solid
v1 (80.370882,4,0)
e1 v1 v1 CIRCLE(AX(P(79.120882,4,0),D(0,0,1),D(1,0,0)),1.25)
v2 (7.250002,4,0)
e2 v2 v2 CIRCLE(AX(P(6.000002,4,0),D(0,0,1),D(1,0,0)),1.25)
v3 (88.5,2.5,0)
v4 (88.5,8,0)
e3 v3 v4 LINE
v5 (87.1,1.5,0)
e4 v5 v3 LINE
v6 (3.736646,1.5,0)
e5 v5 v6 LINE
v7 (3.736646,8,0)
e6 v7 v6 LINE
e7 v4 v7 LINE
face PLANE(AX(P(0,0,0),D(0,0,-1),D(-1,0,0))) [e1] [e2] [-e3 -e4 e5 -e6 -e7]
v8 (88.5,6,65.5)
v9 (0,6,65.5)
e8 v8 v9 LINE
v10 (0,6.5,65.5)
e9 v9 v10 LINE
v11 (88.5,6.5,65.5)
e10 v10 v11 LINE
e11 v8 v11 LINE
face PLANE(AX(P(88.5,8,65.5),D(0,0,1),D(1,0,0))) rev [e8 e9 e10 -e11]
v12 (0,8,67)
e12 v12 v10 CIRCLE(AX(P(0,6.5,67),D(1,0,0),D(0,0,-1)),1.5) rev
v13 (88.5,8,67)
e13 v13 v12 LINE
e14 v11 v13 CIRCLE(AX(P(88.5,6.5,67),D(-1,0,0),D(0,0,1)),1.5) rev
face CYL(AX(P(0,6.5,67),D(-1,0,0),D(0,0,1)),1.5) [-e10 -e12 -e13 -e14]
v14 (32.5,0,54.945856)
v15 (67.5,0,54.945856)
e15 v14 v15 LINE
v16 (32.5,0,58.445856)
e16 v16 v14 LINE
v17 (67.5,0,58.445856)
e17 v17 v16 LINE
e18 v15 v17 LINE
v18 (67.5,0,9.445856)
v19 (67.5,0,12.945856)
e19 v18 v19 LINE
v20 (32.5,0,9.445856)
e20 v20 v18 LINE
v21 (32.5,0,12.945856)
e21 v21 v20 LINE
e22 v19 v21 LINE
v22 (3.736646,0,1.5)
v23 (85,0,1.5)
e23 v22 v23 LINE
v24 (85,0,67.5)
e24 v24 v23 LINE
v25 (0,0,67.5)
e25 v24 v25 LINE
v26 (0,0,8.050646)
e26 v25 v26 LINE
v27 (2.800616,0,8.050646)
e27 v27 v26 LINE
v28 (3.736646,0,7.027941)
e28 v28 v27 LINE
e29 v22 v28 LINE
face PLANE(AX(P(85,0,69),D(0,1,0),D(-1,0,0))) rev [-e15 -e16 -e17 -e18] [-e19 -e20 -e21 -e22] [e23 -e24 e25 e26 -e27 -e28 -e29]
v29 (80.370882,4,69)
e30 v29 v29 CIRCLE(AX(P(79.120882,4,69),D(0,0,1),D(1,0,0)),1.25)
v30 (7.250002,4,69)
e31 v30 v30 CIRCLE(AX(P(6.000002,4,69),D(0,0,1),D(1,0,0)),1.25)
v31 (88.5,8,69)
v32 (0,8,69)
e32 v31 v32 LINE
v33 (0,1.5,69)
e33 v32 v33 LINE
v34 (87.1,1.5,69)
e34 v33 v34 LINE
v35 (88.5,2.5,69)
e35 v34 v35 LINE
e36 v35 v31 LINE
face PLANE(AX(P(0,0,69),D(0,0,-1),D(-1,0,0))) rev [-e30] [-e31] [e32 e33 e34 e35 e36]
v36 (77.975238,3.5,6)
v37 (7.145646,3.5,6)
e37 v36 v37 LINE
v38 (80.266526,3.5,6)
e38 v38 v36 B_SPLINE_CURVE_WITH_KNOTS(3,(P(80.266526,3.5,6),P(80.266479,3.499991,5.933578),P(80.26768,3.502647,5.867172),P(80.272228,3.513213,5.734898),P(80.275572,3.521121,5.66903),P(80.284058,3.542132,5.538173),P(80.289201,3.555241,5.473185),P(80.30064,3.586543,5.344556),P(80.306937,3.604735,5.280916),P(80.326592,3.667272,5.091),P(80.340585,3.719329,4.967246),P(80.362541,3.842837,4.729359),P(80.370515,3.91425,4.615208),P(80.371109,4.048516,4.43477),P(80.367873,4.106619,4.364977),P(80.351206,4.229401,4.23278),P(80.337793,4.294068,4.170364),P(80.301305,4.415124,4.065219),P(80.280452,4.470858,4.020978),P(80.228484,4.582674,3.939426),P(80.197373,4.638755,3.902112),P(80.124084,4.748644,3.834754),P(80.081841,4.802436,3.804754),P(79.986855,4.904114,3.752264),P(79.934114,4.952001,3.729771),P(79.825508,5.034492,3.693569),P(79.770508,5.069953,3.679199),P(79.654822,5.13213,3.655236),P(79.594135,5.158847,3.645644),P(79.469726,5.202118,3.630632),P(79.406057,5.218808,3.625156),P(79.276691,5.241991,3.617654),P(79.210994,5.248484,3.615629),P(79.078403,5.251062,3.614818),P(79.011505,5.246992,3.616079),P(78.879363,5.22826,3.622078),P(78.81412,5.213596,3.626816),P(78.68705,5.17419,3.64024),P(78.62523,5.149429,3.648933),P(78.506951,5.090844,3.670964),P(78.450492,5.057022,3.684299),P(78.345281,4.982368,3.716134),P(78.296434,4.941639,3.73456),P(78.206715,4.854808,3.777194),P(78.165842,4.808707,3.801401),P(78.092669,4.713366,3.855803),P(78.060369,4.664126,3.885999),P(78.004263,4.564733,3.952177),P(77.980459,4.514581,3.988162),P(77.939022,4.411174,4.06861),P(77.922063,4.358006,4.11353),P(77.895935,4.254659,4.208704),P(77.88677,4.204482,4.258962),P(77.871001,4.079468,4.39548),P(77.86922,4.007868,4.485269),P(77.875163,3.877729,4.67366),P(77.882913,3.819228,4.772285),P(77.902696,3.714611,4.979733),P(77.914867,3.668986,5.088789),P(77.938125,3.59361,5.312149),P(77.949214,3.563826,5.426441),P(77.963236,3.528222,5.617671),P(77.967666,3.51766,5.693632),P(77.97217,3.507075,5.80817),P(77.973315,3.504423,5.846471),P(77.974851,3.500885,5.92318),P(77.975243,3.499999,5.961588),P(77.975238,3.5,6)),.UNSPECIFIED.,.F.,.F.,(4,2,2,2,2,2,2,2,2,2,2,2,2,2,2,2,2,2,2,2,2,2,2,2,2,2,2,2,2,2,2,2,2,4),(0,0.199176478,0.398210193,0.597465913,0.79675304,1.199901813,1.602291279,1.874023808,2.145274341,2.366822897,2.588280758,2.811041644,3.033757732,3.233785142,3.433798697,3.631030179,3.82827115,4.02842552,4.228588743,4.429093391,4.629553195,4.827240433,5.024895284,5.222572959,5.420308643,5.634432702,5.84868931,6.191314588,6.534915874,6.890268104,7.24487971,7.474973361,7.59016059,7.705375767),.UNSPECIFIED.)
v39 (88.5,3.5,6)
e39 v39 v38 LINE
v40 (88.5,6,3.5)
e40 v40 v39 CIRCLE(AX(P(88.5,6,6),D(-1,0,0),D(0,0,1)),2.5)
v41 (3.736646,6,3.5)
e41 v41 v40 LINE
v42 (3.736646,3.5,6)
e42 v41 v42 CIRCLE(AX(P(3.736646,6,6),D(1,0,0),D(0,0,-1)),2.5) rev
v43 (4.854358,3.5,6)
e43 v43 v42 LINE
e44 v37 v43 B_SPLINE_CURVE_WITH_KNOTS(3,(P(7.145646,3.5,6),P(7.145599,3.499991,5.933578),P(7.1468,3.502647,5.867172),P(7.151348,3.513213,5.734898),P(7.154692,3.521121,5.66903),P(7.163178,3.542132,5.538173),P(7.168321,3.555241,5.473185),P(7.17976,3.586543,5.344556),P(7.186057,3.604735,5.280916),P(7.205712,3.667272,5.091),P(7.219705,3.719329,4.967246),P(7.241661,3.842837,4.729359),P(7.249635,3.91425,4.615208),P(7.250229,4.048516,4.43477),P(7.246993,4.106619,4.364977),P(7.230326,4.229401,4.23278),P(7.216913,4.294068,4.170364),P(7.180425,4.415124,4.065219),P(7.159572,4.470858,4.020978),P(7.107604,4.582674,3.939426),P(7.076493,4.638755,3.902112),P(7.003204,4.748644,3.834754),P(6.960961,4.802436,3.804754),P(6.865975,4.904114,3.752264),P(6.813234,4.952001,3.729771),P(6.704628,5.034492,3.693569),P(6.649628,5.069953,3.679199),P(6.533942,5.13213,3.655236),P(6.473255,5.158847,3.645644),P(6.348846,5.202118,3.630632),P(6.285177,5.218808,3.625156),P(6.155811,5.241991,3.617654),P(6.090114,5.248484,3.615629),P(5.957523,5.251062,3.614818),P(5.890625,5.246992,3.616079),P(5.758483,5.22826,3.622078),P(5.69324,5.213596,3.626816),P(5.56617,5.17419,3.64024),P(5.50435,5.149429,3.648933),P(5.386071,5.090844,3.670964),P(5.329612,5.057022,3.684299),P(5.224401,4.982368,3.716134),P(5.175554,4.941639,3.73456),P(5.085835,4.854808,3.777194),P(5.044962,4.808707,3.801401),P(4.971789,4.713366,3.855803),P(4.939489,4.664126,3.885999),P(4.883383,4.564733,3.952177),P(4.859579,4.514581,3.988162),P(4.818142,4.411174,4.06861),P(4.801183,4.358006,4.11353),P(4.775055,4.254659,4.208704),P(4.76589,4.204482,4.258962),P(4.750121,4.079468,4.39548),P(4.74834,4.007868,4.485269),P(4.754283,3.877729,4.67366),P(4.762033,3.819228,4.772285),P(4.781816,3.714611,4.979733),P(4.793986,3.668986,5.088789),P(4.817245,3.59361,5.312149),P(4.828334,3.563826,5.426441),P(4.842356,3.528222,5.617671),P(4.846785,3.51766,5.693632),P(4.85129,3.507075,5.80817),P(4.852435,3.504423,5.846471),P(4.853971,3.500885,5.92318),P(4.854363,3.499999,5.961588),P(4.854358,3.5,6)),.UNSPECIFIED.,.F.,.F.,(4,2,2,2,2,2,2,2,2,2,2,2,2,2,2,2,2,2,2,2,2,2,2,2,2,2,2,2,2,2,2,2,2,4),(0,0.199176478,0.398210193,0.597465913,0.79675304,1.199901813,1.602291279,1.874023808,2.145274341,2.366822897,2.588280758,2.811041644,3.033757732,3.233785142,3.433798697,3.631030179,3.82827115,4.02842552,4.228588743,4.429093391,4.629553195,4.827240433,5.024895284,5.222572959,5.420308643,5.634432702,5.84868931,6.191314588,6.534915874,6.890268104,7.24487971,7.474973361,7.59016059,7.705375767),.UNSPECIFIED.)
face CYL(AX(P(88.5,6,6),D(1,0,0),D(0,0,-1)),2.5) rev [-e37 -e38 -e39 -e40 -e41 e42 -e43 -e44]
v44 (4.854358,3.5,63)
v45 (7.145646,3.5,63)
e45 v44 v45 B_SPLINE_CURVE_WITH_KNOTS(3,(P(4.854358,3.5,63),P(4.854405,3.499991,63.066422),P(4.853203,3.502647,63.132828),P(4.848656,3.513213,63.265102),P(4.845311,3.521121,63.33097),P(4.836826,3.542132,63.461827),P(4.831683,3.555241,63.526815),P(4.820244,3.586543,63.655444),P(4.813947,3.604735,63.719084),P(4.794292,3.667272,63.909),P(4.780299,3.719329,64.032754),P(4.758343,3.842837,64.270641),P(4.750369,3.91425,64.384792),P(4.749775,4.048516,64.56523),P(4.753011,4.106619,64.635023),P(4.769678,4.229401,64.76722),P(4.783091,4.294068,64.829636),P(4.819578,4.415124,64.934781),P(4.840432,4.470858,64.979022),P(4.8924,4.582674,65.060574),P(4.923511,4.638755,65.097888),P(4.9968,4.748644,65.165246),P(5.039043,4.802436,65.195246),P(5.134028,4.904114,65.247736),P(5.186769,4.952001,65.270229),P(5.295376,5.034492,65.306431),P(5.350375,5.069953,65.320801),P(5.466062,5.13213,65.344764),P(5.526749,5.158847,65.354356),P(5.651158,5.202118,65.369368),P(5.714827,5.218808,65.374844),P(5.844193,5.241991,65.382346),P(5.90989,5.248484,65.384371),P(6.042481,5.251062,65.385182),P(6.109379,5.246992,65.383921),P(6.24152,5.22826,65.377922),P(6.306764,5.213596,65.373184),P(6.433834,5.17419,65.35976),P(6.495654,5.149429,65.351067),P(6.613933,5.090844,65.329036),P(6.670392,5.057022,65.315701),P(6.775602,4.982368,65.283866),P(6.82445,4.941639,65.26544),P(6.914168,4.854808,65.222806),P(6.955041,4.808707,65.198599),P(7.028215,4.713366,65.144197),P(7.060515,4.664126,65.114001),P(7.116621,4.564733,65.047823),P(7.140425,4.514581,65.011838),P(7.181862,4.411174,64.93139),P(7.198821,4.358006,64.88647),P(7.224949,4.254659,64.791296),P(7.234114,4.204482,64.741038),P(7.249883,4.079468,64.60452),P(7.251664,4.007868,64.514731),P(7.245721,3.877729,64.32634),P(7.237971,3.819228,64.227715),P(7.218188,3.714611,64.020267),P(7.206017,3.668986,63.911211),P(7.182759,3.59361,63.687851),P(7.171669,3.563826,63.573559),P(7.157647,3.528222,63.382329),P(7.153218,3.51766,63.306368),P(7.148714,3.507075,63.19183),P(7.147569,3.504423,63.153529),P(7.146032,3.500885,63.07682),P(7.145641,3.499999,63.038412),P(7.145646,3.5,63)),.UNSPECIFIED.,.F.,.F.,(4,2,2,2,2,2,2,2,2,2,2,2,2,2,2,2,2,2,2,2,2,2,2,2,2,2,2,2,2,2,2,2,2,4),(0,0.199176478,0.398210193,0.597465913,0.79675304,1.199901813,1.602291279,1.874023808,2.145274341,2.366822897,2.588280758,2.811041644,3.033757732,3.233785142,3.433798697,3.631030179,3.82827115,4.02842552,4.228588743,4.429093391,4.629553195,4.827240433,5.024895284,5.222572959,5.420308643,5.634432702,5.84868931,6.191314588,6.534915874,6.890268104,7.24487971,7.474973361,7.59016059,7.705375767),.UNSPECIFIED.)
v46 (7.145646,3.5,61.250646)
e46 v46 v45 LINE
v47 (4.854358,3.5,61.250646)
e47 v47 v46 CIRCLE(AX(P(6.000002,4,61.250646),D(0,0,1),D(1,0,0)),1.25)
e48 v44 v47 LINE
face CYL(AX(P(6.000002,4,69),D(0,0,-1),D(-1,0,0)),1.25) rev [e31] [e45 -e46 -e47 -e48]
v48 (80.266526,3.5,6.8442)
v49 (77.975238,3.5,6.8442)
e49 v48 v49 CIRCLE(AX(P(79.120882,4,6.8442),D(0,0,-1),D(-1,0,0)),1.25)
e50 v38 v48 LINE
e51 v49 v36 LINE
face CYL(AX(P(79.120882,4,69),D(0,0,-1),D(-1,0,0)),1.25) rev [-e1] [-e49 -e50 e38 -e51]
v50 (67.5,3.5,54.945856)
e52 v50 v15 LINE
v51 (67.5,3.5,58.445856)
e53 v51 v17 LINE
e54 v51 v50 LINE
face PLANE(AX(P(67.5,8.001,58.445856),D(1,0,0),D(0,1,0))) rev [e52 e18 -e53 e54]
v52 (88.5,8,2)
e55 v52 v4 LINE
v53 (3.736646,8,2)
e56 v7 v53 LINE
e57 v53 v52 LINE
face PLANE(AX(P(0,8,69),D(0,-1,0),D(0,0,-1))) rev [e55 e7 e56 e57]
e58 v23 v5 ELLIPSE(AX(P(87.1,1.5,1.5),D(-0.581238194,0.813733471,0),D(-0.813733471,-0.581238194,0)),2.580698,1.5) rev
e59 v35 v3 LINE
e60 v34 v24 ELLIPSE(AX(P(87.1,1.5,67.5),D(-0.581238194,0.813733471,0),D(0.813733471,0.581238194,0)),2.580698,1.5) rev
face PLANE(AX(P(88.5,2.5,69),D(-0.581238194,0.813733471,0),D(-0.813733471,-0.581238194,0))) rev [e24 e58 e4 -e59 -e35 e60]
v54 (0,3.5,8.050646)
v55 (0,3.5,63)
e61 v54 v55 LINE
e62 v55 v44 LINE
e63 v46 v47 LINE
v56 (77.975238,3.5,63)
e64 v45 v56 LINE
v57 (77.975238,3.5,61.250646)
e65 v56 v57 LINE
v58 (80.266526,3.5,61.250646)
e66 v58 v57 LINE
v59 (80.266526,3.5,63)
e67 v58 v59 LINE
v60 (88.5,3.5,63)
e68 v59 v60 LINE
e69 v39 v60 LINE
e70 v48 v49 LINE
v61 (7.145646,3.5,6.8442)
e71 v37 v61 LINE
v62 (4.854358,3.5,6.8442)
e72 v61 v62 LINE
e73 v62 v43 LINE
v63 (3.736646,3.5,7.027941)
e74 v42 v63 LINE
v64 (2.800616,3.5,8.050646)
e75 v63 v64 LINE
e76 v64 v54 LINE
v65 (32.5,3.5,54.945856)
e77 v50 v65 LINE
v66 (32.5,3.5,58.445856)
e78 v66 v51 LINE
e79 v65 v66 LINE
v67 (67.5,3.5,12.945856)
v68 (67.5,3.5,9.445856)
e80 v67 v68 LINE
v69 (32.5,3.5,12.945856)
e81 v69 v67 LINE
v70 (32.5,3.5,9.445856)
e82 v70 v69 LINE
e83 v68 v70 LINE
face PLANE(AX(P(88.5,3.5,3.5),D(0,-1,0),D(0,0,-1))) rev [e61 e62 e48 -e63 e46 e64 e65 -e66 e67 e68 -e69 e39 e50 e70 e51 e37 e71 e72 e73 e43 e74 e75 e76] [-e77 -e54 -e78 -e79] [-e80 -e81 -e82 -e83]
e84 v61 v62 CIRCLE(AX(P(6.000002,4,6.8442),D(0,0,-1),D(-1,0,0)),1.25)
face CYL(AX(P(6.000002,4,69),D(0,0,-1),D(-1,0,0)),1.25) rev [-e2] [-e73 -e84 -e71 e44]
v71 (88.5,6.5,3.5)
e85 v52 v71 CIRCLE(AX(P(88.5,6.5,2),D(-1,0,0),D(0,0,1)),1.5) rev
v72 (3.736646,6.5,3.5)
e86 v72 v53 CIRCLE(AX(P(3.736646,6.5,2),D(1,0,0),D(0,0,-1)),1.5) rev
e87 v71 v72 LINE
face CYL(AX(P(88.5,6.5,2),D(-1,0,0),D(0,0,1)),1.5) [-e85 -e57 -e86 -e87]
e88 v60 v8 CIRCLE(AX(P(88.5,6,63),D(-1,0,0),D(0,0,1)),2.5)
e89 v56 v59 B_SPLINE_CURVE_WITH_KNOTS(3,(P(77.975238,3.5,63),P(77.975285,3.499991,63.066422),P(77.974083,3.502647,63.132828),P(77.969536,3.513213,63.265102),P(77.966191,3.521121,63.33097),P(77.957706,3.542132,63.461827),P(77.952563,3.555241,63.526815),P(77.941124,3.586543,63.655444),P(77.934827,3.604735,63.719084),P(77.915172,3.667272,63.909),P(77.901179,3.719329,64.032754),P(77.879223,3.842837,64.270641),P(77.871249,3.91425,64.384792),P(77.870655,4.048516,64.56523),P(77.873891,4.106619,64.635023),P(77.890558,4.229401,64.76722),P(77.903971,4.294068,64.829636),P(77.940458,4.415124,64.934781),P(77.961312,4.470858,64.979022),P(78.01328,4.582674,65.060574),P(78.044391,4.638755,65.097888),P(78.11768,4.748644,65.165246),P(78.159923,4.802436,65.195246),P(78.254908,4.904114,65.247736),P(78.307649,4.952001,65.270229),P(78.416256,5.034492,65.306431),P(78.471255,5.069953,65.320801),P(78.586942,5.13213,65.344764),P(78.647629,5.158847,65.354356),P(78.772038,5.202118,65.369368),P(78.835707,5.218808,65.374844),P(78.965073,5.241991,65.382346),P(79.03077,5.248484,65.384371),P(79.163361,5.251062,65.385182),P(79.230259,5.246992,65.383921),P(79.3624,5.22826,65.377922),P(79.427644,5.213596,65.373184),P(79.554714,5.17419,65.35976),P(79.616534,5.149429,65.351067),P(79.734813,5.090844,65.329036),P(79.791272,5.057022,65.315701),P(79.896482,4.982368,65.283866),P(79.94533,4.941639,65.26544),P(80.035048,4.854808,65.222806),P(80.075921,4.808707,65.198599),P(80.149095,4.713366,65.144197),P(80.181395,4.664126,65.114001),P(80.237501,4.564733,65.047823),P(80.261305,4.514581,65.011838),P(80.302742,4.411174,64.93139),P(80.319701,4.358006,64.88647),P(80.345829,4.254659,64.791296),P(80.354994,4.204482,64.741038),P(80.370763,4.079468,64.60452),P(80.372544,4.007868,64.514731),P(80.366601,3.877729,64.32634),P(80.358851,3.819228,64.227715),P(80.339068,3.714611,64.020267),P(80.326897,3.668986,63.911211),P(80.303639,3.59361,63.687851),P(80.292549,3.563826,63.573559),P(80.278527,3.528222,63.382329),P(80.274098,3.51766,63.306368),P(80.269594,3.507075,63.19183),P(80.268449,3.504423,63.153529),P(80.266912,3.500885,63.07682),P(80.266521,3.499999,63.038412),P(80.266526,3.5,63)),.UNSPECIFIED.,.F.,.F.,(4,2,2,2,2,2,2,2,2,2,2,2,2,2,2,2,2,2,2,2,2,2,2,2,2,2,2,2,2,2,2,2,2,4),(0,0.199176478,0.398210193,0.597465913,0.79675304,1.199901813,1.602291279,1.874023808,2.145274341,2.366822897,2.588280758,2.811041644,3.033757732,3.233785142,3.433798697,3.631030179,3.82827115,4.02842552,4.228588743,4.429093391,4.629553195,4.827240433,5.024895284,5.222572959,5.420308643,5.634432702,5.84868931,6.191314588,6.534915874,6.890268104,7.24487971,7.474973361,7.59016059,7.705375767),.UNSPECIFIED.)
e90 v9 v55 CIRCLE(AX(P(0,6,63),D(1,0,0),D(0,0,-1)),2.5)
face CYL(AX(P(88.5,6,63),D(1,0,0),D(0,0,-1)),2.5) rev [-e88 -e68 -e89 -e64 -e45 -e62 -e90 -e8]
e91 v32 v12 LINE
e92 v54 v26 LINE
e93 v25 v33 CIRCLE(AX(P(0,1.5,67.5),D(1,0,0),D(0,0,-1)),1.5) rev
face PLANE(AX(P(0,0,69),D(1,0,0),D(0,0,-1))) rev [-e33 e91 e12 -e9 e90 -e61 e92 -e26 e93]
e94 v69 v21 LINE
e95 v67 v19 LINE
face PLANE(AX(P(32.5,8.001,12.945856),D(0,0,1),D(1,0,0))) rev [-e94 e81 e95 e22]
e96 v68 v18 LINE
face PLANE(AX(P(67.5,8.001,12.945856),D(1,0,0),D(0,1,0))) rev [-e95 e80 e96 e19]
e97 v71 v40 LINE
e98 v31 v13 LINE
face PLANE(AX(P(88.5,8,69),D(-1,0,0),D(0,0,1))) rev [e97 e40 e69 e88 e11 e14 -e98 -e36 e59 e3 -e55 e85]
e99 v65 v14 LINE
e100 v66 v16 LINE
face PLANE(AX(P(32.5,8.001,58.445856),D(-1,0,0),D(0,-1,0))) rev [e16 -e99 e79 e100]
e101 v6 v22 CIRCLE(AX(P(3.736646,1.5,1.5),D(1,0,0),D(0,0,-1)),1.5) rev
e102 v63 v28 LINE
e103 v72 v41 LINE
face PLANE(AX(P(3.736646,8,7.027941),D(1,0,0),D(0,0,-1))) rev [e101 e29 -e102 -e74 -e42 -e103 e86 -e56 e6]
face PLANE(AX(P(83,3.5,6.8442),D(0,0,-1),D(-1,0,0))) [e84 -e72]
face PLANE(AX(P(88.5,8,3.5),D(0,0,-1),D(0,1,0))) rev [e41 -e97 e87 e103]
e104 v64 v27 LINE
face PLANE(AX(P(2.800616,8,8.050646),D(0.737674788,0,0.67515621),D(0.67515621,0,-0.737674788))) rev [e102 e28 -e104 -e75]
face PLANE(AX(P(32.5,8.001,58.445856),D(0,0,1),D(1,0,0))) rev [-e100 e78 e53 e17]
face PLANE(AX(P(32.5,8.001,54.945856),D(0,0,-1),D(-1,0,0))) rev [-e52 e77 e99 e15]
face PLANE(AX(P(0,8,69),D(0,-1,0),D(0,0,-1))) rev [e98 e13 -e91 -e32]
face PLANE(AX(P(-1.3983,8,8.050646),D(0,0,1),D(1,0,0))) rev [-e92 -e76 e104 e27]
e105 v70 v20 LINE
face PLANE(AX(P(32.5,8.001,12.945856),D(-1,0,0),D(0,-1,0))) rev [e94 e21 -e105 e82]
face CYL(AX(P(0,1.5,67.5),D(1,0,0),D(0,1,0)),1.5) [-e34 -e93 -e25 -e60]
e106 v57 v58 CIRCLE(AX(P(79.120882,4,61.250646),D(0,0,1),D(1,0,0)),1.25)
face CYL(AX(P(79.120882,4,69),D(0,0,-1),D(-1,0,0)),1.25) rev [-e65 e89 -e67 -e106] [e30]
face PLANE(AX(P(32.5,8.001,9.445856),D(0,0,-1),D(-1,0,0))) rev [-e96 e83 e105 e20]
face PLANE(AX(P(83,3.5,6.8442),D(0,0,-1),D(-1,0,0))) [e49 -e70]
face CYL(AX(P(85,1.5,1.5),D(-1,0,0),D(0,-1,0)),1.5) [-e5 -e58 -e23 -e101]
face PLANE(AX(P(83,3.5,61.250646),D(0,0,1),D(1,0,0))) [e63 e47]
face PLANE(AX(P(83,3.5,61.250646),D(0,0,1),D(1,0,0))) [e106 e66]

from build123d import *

# Parameters (mm, degrees)
SKETCH2_R           = 1.25
BOSS_EXTRUDE1_DEPTH = 69
SKETCH3_W           = 62
SKETCH3_H           = 4.5
CUT_EXTRUDE1_DEPTH  = 113.504444357
SKETCH4_W           = 54.406446317
SKETCH4_H           = 2.417375431
BOSS_EXTRUDE2_DEPTH = 83
FILLET1_R           = 1.5
FILLET2_R           = 2.5
FILLET3_R           = 1.5
CUT_EXTRUDE3_DEPTH  = 113.504444497
CUT_EXTRUDE5_REACH  = 114.504
SKETCH7_W           = 35
SKETCH7_H           = 3.5


with BuildPart() as part:
    # Sketch2 → Boss-Extrude1 (new body)
    with BuildSketch(Plane.XY):
        Polygon((0, 0), (0, 8), (88.5, 8), (88.5, 2.5), (85, 0), align=None)
        with Locations((6.000001876, 4)):
            Circle(SKETCH2_R, mode=Mode.SUBTRACT)
        with Locations((79.120881892, 4)):
            Circle(SKETCH2_R, mode=Mode.SUBTRACT)
    extrude(amount=BOSS_EXTRUDE1_DEPTH)

    # Sketch3 → Cut-Extrude1 (cut, through all)
    with BuildSketch(Plane.ZY):
        with Locations((34.5, 5.75)):
            Rectangle(SKETCH3_W, SKETCH3_H)
    extrude(amount=-CUT_EXTRUDE1_DEPTH, mode=Mode.SUBTRACT)

    # Sketch4 → Boss-Extrude2 (add)
    with BuildSketch(Plane.ZY):
        with Locations((34.04742318, 2.291312285)):
            Rectangle(SKETCH4_W, SKETCH4_H)
    extrude(amount=-BOSS_EXTRUDE2_DEPTH)

    # Fillet1
    fillet1_edges = [part.edges().sort_by_distance(p)[0] for p in [
        (42.5, 0, 69),
        (42.5, 0, 0),
    ]]
    fillet(fillet1_edges, radius=FILLET1_R)

    # Fillet2
    # the kernel refuses this fillet: 2.5 mm, written as the material it adds along each edge
    with BuildSketch(Plane(origin=(0, 3.5, 65.5), x_dir=(0, 0, -1), z_dir=(1, 0, 0))) as fillet2_piece_1_section:
        with BuildLine():
            CenterArc((FILLET2_R, FILLET2_R), FILLET2_R, 180, 90)
            Line((0, FILLET2_R), (0, 0))
            Line((0, 0), (FILLET2_R, 0))
        make_face()
    fillet2_piece_1 = extrude(amount=11.104357952, mode=Mode.PRIVATE)
    fillet2_piece_1 = fillet2_piece_1 - Plane(origin=(6.000001876, 4, 63.653309705), x_dir=(1, 0, 0), z_dir=(0, 0, -1)) * Cylinder(1.25, 33, mode=Mode.PRIVATE)
    add(fillet2_piece_1)
    with BuildSketch(Plane(origin=(0.8956458, 3.5, 65.5), x_dir=(0, 0, -1), z_dir=(1, 0, 0))) as fillet2_piece_2_section:
        with BuildLine():
            CenterArc((FILLET2_R, FILLET2_R), FILLET2_R, 180, 90)
            Line((0, FILLET2_R), (0, 0))
            Line((0, 0), (FILLET2_R, 0))
        make_face()
    fillet2_piece_2 = extrude(amount=83.329592169, mode=Mode.PRIVATE)
    fillet2_piece_2 = fillet2_piece_2 - Plane(origin=(6.000001876, 4, 64.936218349), x_dir=(1, 0, 0), z_dir=(0, 0, -1)) * Cylinder(1.25, 177, mode=Mode.PRIVATE)
    fillet2_piece_2 = fillet2_piece_2 - Plane(origin=(79.120881892, 4, 64.936218349), x_dir=(1, 0, 0), z_dir=(0, 0, -1)) * Cylinder(1.25, 177, mode=Mode.PRIVATE)
    add(fillet2_piece_2)
    with BuildSketch(Plane(origin=(0, 3.5, 3.5), x_dir=(0, 1, 0), z_dir=(1, 0, 0))) as fillet2_piece_3_section:
        with BuildLine():
            CenterArc((FILLET2_R, FILLET2_R), FILLET2_R, 180, 90)
            Line((0, FILLET2_R), (0, 0))
            Line((0, 0), (FILLET2_R, 0))
        make_face()
    fillet2_piece_3 = extrude(amount=11.104357952, mode=Mode.PRIVATE)
    fillet2_piece_3 = fillet2_piece_3 - Plane(origin=(6.000001876, 4, 3.561814983), x_dir=(1, 0, 0), z_dir=(0, 0, -1)) * Cylinder(1.25, 33, mode=Mode.PRIVATE)
    add(fillet2_piece_3)
    with BuildSketch(Plane(origin=(74.016525816, 3.5, 3.5), x_dir=(0, 1, 0), z_dir=(1, 0, 0))) as fillet2_piece_4_section:
        with BuildLine():
            CenterArc((FILLET2_R, FILLET2_R), FILLET2_R, 180, 90)
            Line((0, FILLET2_R), (0, 0))
            Line((0, 0), (FILLET2_R, 0))
        make_face()
    fillet2_piece_4 = extrude(amount=14.483474184, mode=Mode.PRIVATE)
    fillet2_piece_4 = fillet2_piece_4 - Plane(origin=(79.120881892, 4, 4.058892955), x_dir=(1, 0, 0), z_dir=(0, 0, -1)) * Cylinder(1.25, 39, mode=Mode.PRIVATE)
    add(fillet2_piece_4)
    with BuildSketch(Plane(origin=(0.8956458, 3.5, 3.5), x_dir=(0, 1, 0), z_dir=(1, 0, 0))) as fillet2_piece_5_section:
        with BuildLine():
            CenterArc((FILLET2_R, FILLET2_R), FILLET2_R, 180, 90)
            Line((0, FILLET2_R), (0, 0))
            Line((0, 0), (FILLET2_R, 0))
        make_face()
    fillet2_piece_5 = extrude(amount=83.329592169, mode=Mode.PRIVATE)
    fillet2_piece_5 = fillet2_piece_5 - Plane(origin=(79.120881892, 4, 4.063781674), x_dir=(1, 0, 0), z_dir=(0, 0, -1)) * Cylinder(1.25, 177, mode=Mode.PRIVATE)
    fillet2_piece_5 = fillet2_piece_5 - Plane(origin=(6.000001876, 4, 4.063781674), x_dir=(1, 0, 0), z_dir=(0, 0, -1)) * Cylinder(1.25, 177, mode=Mode.PRIVATE)
    add(fillet2_piece_5)
    with BuildSketch(Plane(origin=(74.016525816, 3.5, 65.5), x_dir=(0, 0, -1), z_dir=(1, 0, 0))) as fillet2_piece_6_section:
        with BuildLine():
            CenterArc((FILLET2_R, FILLET2_R), FILLET2_R, 180, 90)
            Line((0, FILLET2_R), (0, 0))
            Line((0, 0), (FILLET2_R, 0))
        make_face()
    fillet2_piece_6 = extrude(amount=14.483474184, mode=Mode.PRIVATE)
    fillet2_piece_6 = fillet2_piece_6 - Plane(origin=(79.120881892, 4, 64.941107203), x_dir=(1, 0, 0), z_dir=(0, 0, -1)) * Cylinder(1.25, 39, mode=Mode.PRIVATE)
    add(fillet2_piece_6)

    # Fillet3
    fillet3_edges = [part.edges().sort_by_distance(p)[0] for p in [
        (44.25, 8, 3.5),
        (44.25, 8, 65.5),
    ]]
    fillet(fillet3_edges, radius=FILLET3_R)

    # Sketch6 → Cut-Extrude3 (cut, through all)
    with BuildSketch(Plane.XZ):
        Polygon((-1.398299913, 8.05064563), (2.800616001, 8.05064563), (3.736645897, 7.027940595), (3.736645897, 1.098360778), (3.736645897, 0), (-1.236121559, -1.139461127), align=None)
    extrude(amount=-CUT_EXTRUDE3_DEPTH, mode=Mode.SUBTRACT)

    # Sketch7 → Cut-Extrude5 (cut, up to next)
    with BuildSketch(Plane.XZ, mode=Mode.PRIVATE) as cut_extrude5_sk1:
        with Locations((50, 56.69585569)):
            Rectangle(SKETCH7_W, SKETCH7_H)
    cut_extrude5_tool1 = extrude(cut_extrude5_sk1.sketch, amount=-CUT_EXTRUDE5_REACH, mode=Mode.PRIVATE) & part.part
    # Sketch7 → Cut-Extrude5 (cut, up to next)
    with BuildSketch(Plane.XZ, mode=Mode.PRIVATE) as cut_extrude5_sk2:
        with Locations((50, 11.19585569)):
            Rectangle(SKETCH7_W, SKETCH7_H)
    cut_extrude5_tool2 = extrude(cut_extrude5_sk2.sketch, amount=-CUT_EXTRUDE5_REACH, mode=Mode.PRIVATE) & part.part
    add(cut_extrude5_tool1.solids().sort_by_distance((50, 0, 56.695856))[0], mode=Mode.SUBTRACT)
    add(cut_extrude5_tool2.solids().sort_by_distance((50, 0, 11.195856))[0], mode=Mode.SUBTRACT)


solid = part.part
